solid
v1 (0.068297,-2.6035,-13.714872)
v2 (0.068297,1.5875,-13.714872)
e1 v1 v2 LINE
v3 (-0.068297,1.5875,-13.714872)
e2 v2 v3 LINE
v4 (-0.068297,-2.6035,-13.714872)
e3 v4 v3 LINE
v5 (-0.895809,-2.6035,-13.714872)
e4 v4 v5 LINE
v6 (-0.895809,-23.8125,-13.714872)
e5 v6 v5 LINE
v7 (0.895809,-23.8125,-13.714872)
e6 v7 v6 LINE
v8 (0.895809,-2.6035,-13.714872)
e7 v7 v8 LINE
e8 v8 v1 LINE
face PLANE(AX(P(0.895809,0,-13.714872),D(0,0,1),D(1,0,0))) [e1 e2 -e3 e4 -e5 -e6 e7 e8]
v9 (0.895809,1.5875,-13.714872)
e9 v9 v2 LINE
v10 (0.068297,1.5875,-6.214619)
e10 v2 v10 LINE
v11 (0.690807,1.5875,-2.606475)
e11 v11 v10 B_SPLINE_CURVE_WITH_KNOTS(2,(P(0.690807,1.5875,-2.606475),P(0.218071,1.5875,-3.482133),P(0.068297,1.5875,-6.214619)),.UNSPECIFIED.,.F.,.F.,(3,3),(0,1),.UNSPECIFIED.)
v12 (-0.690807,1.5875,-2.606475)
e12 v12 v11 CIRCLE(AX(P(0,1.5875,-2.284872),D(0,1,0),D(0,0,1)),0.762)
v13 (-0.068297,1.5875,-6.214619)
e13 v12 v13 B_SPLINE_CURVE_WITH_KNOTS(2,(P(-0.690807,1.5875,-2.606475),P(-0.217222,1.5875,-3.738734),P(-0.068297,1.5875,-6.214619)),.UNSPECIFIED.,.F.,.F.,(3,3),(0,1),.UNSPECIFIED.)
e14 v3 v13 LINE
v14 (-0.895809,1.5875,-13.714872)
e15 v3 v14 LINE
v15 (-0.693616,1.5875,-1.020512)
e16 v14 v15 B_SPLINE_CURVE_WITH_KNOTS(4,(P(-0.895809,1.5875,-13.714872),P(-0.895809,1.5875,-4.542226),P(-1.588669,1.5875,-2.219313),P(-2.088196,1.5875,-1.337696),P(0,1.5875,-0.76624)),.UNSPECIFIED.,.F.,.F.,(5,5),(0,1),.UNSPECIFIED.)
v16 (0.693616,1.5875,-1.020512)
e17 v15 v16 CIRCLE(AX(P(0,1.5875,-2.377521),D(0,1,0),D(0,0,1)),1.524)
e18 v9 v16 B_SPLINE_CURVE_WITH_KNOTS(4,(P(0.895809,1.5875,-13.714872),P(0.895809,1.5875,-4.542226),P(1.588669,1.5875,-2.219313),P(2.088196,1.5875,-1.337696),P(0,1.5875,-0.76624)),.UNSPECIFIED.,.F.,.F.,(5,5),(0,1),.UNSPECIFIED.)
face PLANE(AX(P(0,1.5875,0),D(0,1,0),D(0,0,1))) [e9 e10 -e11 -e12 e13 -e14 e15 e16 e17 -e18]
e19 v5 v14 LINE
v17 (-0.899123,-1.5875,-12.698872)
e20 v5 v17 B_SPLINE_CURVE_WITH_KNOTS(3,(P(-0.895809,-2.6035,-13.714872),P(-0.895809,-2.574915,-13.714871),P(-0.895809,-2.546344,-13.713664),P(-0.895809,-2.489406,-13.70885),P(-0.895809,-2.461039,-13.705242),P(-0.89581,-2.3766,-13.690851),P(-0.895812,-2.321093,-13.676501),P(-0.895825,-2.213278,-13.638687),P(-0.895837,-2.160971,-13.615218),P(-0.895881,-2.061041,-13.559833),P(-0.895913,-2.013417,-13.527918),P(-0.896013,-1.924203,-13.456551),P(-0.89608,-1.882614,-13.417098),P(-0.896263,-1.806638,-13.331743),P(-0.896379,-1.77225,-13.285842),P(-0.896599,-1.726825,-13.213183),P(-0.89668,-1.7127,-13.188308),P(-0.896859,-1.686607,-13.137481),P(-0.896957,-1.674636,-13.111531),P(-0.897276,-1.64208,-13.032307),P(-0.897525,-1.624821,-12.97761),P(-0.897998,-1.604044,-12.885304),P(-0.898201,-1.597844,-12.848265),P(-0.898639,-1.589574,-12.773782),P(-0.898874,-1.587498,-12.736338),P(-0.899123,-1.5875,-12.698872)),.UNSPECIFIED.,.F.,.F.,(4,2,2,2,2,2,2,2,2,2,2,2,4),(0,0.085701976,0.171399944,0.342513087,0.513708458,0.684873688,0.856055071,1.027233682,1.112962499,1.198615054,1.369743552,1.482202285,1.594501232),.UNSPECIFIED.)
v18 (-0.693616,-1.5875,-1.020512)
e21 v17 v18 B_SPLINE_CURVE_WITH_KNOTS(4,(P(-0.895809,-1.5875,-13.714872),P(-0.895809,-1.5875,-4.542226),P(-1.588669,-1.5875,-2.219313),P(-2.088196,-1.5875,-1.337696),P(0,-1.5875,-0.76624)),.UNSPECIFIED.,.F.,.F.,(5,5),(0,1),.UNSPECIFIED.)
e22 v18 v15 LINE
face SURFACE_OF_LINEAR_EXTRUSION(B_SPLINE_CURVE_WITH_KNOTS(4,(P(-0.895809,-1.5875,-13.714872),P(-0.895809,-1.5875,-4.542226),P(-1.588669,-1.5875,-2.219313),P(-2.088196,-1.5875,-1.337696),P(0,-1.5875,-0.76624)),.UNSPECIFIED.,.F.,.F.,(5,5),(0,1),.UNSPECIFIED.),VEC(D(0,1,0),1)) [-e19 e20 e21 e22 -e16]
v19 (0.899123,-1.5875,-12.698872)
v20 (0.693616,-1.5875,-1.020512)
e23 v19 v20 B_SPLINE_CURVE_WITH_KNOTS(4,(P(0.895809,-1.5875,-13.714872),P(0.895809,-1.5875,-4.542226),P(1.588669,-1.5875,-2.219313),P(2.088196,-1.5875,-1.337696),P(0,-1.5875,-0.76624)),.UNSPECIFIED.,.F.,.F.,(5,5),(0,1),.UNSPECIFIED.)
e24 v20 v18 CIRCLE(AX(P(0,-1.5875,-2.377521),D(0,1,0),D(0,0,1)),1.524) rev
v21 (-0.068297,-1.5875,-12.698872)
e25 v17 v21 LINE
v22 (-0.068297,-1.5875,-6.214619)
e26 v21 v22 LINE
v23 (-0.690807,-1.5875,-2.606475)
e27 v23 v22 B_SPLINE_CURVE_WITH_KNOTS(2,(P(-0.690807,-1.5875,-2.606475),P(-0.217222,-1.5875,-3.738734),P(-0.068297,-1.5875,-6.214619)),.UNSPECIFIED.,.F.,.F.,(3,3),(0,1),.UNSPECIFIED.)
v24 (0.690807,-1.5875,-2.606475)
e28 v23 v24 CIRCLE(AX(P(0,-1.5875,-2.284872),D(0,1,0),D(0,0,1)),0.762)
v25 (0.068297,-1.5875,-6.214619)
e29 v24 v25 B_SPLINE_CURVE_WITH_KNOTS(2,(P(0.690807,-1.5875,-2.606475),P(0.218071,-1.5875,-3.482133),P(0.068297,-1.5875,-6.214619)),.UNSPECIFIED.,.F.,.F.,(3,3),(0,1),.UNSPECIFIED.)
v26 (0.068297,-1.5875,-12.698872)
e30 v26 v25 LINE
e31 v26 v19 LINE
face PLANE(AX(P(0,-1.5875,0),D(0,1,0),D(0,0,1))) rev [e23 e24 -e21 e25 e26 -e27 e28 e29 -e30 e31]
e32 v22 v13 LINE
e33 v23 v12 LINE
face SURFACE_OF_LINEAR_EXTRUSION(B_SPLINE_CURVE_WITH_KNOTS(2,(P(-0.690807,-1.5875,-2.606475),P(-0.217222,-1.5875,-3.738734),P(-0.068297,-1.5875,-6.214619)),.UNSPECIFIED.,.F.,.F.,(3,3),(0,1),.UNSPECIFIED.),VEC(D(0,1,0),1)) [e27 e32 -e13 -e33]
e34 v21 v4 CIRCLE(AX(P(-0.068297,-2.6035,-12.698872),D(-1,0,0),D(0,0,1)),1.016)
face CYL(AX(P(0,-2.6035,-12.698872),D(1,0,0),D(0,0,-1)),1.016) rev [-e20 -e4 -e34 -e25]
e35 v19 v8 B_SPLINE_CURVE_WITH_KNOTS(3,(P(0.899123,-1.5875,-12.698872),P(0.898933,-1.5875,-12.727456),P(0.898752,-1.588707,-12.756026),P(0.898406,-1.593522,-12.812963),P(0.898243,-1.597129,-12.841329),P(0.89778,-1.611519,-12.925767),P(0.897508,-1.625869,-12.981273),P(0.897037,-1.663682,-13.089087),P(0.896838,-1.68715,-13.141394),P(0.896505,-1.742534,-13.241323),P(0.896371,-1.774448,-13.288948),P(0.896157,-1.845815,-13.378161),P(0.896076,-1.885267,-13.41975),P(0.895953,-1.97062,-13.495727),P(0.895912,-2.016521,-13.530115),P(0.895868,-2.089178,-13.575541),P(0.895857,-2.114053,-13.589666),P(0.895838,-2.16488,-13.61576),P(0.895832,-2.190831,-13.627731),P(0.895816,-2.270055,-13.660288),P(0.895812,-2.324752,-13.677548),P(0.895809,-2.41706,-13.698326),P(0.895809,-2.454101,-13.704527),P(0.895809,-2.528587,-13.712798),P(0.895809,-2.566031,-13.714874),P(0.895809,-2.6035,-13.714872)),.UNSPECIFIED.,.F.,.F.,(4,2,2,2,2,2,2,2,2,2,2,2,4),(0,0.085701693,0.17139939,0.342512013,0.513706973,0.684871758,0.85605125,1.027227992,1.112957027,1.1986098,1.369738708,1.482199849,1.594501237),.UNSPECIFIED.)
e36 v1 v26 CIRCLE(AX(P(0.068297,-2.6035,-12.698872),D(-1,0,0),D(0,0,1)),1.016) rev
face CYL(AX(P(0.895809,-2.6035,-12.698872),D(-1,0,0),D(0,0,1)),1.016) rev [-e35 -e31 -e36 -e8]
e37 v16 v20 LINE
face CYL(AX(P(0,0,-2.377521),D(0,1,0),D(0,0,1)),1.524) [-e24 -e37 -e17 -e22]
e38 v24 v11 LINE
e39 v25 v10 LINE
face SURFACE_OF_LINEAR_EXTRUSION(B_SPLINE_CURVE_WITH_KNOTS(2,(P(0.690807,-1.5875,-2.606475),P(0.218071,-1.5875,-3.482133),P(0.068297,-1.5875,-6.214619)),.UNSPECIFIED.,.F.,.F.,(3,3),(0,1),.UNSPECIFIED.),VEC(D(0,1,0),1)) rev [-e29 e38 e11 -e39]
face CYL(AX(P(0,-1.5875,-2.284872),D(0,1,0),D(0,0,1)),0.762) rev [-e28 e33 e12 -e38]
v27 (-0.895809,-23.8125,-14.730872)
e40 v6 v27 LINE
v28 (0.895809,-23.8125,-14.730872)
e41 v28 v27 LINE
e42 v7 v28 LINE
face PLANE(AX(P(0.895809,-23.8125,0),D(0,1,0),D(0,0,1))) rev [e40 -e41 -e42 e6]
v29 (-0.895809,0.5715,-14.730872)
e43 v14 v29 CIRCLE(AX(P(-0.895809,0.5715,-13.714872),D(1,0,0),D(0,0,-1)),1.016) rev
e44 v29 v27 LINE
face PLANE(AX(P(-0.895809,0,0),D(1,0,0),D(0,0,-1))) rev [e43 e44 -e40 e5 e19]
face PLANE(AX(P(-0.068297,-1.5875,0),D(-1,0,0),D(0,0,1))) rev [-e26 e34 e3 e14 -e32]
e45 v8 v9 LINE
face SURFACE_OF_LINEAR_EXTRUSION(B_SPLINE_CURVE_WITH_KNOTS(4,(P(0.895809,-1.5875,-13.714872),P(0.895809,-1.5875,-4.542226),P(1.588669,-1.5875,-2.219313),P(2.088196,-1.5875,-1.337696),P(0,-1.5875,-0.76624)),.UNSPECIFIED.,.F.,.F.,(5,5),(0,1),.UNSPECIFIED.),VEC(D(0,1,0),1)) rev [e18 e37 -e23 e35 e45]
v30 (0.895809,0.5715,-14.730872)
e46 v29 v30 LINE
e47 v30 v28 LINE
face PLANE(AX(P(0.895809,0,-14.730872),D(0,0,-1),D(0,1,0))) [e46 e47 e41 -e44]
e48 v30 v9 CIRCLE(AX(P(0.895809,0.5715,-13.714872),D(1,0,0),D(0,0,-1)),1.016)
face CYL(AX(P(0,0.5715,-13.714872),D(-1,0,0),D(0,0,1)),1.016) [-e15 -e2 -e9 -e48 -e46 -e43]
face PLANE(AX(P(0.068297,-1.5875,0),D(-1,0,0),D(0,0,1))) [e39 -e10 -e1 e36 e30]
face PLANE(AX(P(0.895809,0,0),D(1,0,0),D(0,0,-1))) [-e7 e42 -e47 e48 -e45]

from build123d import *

# Parameters (mm, degrees)
BOSS_EXTRUDE1_DEPTH      = 1.5875
BOSS_EXTRUDE1_DEPTH_BACK = 1.5875
FILLET1_R                = 1.524
BOSS_EXTRUDE2_DEPTH      = 0.89581
BOSS_EXTRUDE2_DEPTH_BACK = 0.89581
FILLET2_R                = 1.016


with BuildPart() as part:
    # Sketch1 → Boss-Extrude1 (new, two sides: drawn at the far end of the back side and taken through both)
    with BuildSketch(Plane(origin=(0, 0, 0), x_dir=(1, 0, 0), z_dir=(0, 1, 0)).offset(-BOSS_EXTRUDE1_DEPTH_BACK)):
        with BuildLine():
            Line((-0.068296764, 6.214618695), (-0.068296764, 13.71487153))
            Line((-0.068296764, 13.71487153), (-0.895808533, 13.71487153))
            add(Edge.make_bspline(
                [(-0.895808533, 13.71487153), (-0.895808533, 4.54222596), (-1.588668774, 2.219313027), (-2.088196173, 1.337696034), (0, 0.766240154)],
                knots=[0, 0, 0, 0, 0, 1, 1, 1, 1, 1], degree=4))
            add(Edge.make_bspline(
                [(0.895808533, 13.71487153), (0.895808533, 4.54222596), (1.588668774, 2.219313027), (2.088196173, 1.337696034), (0, 0.766240154)],
                knots=[0, 0, 0, 0, 0, 1, 1, 1, 1, 1], degree=4))
            Line((0.895808533, 13.71487153), (0.068296764, 13.71487153))
            Line((0.068296764, 13.71487153), (0.068296764, 6.214618695))
            add(Edge.make_bspline(
                [(0.690807422, 2.606475487), (0.218071276, 3.482132924), (0.068296764, 6.214618695)],
                knots=[0, 0, 0, 1, 1, 1], degree=2))
            ThreePointArc((0.690807422, 2.606475487), (0, 1.52287153), (-0.690807422, 2.606475487))
            add(Edge.make_bspline(
                [(-0.690807422, 2.606475487), (-0.217222133, 3.738734236), (-0.068296764, 6.214618695)],
                knots=[0, 0, 0, 1, 1, 1], degree=2))
        make_face()
    extrude(amount=BOSS_EXTRUDE1_DEPTH + BOSS_EXTRUDE1_DEPTH_BACK)

    # Fillet1
    fillet1_edges = [part.edges().sort_by_distance(p)[0] for p in [
        (0, -0.79375, -0.766240154),
    ]]
    fillet(fillet1_edges, radius=FILLET1_R)

    # Sketch2 → Boss-Extrude2 (add, two sides: drawn at the far end of the back side and taken through both)
    with BuildSketch(Plane(origin=(0, 0, 0), x_dir=(0, 0, -1), z_dir=(1, 0, 0)).offset(-BOSS_EXTRUDE2_DEPTH_BACK)):
        Polygon((13.71487153, 1.5875), (13.71487153, -1.5875), (13.71487153, -23.8125), (14.73087153, -23.8125), (14.73087153, 1.5875), align=None)
    extrude(amount=BOSS_EXTRUDE2_DEPTH + BOSS_EXTRUDE2_DEPTH_BACK)

    # Fillet2
    fillet2_edges = [part.edges().sort_by_distance(p)[0] for p in [
        (0, 1.5875, -14.73087153),
        (0.482052648, -1.5875, -13.71487153),
        (-0.482052648, -1.5875, -13.71487153),
    ]]
    fillet(fillet2_edges, radius=FILLET2_R - 0.0001)  # a hair under: the kernel refuses the full size


solid = part.part
